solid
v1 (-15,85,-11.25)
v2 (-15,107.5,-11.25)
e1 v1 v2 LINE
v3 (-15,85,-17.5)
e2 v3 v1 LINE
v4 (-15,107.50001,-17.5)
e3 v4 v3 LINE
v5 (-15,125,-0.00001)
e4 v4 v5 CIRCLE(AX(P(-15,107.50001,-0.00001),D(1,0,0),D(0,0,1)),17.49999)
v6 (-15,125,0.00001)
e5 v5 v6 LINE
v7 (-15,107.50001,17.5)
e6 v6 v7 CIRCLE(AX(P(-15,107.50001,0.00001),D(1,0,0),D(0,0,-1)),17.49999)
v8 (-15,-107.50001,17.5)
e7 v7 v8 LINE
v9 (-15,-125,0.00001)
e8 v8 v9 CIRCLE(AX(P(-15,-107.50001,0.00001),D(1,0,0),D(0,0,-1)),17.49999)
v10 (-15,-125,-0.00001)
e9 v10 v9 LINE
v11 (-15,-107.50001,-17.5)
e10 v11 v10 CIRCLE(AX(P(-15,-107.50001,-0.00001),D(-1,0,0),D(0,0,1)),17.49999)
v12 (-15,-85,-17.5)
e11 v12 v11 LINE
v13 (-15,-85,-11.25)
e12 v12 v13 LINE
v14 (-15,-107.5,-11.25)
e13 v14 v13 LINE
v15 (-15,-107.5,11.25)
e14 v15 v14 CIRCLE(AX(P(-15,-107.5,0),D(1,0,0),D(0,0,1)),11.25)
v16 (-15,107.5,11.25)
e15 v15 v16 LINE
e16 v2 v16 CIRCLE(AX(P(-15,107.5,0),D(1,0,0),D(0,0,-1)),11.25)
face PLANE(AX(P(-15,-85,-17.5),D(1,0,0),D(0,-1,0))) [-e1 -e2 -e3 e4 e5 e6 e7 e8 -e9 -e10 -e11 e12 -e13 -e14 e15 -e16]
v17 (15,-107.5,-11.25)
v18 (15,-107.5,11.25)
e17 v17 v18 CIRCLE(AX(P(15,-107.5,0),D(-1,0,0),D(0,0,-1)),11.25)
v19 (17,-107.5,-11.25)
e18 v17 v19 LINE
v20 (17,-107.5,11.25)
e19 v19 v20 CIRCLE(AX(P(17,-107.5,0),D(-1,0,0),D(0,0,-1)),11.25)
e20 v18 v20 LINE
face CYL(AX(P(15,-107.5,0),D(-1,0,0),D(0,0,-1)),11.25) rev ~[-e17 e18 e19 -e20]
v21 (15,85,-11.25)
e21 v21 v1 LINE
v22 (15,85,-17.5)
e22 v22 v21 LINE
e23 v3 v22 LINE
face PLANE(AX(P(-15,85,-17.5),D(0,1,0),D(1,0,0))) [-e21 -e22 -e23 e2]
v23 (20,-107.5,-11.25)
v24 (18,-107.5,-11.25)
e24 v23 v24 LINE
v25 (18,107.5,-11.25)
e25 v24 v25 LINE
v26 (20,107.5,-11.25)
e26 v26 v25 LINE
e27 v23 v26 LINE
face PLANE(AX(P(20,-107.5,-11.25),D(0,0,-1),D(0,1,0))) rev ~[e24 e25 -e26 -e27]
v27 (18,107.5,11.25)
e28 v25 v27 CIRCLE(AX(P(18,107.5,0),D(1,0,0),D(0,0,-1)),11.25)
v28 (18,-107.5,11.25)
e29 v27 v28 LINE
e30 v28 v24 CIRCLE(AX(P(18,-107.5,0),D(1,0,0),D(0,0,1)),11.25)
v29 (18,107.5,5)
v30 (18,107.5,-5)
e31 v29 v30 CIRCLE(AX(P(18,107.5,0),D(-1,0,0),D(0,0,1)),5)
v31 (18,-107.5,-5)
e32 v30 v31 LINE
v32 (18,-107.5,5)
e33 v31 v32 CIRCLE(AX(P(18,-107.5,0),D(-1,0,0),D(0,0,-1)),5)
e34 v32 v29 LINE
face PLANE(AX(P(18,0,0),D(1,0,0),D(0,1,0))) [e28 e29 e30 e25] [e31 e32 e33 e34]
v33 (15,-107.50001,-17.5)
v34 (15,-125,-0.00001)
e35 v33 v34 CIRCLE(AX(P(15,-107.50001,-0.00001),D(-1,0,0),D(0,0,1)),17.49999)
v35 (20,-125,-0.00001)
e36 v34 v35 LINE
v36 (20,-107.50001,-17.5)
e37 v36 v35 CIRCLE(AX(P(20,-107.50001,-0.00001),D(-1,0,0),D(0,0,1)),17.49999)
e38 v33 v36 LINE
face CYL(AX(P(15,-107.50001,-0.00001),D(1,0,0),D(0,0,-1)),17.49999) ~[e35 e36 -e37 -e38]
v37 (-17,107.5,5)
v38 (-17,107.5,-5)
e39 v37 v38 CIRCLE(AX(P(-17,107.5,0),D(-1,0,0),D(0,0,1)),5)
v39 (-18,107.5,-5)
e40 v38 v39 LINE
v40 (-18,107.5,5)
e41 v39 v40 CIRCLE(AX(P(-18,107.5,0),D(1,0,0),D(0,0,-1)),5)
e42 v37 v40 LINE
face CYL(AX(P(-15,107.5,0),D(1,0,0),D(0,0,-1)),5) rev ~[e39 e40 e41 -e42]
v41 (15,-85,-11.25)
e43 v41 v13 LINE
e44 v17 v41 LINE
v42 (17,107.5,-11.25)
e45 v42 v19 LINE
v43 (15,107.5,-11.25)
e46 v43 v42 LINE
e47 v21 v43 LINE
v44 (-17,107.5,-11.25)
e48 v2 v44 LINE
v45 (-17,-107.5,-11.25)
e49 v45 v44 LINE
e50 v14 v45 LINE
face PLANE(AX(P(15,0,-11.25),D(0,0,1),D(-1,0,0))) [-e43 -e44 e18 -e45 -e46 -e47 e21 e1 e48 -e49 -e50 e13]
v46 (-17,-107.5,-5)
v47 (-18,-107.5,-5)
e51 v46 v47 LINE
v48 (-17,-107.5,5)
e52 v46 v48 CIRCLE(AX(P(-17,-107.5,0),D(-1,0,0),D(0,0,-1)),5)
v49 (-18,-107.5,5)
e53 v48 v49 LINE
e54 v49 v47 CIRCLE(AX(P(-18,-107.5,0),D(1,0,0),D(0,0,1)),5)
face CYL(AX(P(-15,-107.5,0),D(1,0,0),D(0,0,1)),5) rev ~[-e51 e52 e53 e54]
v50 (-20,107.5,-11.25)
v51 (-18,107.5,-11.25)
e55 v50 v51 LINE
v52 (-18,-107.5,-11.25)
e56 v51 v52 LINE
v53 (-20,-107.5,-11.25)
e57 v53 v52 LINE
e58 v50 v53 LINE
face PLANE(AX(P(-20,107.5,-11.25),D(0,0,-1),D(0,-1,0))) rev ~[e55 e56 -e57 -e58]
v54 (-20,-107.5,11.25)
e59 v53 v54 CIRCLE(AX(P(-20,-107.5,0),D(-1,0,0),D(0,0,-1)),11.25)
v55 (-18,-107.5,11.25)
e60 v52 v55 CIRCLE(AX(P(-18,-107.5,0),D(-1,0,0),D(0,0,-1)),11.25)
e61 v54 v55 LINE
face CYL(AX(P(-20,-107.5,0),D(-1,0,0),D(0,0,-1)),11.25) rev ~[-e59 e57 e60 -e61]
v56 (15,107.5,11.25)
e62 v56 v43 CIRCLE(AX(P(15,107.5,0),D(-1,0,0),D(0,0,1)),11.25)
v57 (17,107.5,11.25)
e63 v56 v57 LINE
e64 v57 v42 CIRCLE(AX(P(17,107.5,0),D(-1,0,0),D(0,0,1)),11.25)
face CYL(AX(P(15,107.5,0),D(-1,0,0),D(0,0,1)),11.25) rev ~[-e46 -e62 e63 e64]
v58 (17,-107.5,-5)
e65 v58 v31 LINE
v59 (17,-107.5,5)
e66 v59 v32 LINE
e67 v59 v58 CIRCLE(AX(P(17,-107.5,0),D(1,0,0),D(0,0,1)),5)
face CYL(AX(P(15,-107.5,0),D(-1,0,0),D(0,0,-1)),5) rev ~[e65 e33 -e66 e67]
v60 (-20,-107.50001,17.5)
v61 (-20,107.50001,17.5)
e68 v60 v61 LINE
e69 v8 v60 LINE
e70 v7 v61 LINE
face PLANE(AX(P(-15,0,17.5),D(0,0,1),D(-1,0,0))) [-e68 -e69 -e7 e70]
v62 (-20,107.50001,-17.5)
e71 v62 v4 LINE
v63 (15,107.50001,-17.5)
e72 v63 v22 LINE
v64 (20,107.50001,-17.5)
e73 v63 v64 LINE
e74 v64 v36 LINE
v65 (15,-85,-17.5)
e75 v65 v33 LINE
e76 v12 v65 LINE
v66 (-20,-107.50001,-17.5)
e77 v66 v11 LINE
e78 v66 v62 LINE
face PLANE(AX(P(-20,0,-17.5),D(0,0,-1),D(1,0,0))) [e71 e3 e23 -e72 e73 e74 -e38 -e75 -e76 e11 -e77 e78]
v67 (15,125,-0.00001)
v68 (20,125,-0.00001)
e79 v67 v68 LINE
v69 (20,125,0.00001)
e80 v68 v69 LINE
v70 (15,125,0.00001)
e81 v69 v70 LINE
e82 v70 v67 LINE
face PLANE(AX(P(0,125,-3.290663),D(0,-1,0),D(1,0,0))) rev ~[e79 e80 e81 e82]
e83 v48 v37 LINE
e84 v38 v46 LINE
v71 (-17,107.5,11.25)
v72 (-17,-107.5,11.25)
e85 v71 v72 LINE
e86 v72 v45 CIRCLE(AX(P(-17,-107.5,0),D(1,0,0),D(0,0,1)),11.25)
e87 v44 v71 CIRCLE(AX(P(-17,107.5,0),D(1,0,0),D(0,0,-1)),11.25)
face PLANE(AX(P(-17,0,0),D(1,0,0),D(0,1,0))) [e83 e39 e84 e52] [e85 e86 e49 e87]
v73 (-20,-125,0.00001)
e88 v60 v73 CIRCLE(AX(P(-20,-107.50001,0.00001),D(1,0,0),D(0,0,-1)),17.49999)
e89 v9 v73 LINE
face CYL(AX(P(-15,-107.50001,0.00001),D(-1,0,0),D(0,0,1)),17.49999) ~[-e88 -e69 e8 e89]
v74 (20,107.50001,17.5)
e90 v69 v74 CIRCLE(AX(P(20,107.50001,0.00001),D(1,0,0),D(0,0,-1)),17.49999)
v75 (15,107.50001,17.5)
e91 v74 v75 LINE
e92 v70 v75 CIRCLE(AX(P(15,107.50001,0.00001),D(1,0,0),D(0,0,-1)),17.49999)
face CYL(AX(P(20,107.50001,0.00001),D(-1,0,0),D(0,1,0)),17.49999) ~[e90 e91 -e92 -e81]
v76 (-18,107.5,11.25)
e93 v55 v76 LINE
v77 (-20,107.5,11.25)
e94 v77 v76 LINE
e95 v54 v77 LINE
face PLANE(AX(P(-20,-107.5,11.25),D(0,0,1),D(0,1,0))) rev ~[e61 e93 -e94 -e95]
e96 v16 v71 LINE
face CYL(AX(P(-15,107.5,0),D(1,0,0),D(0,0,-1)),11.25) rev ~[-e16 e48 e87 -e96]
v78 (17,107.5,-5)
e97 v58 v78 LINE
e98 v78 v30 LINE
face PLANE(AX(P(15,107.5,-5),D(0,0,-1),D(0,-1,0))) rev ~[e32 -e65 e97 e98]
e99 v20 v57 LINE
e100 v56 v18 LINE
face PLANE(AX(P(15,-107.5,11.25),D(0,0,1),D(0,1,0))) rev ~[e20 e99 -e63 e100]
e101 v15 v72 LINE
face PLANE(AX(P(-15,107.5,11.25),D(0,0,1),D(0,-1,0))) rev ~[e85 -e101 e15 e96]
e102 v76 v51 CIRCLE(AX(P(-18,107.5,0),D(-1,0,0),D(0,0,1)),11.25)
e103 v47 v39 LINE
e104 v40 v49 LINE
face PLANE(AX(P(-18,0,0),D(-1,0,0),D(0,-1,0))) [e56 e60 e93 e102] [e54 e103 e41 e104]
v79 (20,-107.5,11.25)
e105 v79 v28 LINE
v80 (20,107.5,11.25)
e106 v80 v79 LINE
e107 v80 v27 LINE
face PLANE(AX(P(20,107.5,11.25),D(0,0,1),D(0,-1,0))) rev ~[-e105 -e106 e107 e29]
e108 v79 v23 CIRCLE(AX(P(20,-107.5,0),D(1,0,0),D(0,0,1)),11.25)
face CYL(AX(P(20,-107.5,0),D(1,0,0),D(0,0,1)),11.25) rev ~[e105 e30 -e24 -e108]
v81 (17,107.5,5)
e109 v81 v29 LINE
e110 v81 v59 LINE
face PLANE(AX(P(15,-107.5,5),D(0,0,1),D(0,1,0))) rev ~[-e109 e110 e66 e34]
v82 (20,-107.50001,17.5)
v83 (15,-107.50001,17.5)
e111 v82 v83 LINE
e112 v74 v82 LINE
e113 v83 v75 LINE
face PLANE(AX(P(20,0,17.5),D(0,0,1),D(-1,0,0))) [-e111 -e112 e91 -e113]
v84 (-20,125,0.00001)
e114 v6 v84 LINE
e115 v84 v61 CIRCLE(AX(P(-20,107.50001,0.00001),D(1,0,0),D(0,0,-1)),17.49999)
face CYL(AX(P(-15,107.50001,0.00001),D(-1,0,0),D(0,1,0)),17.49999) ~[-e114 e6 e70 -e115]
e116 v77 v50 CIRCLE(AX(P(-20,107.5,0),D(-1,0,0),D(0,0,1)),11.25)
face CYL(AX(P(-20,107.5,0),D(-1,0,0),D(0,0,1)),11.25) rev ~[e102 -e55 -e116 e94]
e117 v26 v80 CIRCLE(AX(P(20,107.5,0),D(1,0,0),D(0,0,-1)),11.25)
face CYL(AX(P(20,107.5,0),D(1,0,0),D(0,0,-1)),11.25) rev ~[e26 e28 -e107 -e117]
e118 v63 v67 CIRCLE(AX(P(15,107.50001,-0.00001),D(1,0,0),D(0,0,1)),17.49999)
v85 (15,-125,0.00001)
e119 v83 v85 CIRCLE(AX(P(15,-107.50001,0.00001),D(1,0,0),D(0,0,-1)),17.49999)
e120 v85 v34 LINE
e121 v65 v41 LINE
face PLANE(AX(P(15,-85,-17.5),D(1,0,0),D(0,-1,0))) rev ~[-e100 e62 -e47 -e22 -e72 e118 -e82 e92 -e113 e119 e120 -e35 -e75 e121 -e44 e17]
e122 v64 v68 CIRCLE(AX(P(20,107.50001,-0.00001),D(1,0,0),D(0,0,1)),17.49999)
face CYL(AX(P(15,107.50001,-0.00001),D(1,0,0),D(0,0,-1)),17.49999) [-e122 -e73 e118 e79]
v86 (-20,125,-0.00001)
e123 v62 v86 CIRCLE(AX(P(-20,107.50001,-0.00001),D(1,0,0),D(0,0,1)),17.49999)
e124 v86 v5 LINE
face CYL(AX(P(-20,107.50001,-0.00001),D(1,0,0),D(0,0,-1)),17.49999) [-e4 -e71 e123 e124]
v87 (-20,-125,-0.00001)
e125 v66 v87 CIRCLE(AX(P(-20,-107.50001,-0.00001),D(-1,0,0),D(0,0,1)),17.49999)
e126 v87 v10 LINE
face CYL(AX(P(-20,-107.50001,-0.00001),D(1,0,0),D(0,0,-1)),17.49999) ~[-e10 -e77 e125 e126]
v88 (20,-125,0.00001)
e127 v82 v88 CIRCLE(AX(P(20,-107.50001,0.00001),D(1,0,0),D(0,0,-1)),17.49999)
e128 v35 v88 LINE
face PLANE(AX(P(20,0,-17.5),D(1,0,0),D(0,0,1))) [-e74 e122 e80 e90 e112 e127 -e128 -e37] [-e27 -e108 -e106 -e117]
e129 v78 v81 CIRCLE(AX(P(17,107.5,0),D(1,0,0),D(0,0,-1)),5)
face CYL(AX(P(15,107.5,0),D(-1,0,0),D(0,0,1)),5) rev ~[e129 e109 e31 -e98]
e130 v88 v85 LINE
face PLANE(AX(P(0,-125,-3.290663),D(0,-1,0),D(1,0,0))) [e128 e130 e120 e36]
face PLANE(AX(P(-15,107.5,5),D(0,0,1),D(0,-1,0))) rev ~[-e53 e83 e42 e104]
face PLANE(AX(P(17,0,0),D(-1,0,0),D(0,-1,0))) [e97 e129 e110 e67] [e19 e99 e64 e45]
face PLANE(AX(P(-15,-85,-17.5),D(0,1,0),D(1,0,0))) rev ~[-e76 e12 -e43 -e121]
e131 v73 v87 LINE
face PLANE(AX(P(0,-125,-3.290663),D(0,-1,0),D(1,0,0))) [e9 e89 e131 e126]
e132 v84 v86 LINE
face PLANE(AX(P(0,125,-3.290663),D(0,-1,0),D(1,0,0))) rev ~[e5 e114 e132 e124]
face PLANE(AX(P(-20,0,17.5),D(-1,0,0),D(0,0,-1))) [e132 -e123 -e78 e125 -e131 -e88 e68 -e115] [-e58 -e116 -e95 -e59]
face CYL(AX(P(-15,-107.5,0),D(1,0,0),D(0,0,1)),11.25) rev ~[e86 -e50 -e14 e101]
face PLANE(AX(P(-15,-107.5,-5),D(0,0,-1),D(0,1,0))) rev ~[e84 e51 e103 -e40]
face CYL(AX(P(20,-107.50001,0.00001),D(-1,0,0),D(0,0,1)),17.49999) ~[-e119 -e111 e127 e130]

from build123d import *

# Parameters (mm, degrees)
F1_DEPTH      = 125
F1_DEPTH_BACK = 125
F6_DEPTH      = 5.0009999999
F7_DEPTH      = 5.0010000001
F8_DEPTH      = 2
F9_DEPTH      = 2
F10_DEPTH     = 2
F11_DEPTH     = 2
F12_W         = 30
F12_H         = 40
F13_DEPTH     = 35.001
F14_R         = 17.49999


# Not quite as in the source:
# - a fillet or chamfer is up to 0.001 mm smaller than in the source, because OpenCascade refuses the exact size


with BuildPart() as f1:
    # F0 (on Front) → F1 (new body, two sides)
    with BuildSketch(Plane.XZ) as f1_sk:
        Polygon((-20, -17.5), (20, -17.5), (20, 17.5), (15, 17.5), (15, -11.25), (-15, -11.25), (-15, 17.5), (-20, 17.5), align=None)
    extrude(amount=F1_DEPTH)
    extrude(f1_sk.sketch, amount=-F1_DEPTH_BACK)

    # F3 (on face) → F6 (cut, through all)
    with BuildSketch(Plane(origin=(15.0000000001, 0, 0), x_dir=(0, -1, 0), z_dir=(-1, 0, 0))):
        with BuildLine():
            Line((107.5, 4.9999999999), (0, 4.9999999999))
            Line((0, 4.9999999999), (-107.5, 4.9999999999))
            ThreePointArc((-107.5, 4.9999999999), (-112.5, -2e-10), (-107.5, -5.0000000004))
            Line((-107.5, -5.0000000004), (0, -5.0000000004))
            Line((0, -5.0000000004), (107.5, -5.0000000004))
            ThreePointArc((107.5, -5.0000000004), (112.5000000001, -2e-10), (107.5, 4.9999999999))
        make_face()
    extrude(amount=-F6_DEPTH, mode=Mode.SUBTRACT)

    # F2 (on face) → F7 (cut, through all)
    with BuildSketch(Plane.YZ.offset(-14.9999999999)):
        with BuildLine():
            Line((107.5, 5), (0, 5))
            Line((0, 5), (-107.5, 5))
            ThreePointArc((-107.5, 5), (-112.5, 0), (-107.5, -5))
            Line((-107.5, -5), (0, -5))
            Line((0, -5), (107.5, -5))
            ThreePointArc((107.5, -5), (112.5, 0), (107.5, 5))
        make_face()
    extrude(amount=-F7_DEPTH, mode=Mode.SUBTRACT)

    # F3 (on face) → F8 (cut)
    with BuildSketch(Plane(origin=(15.0000000001, 0, 0), x_dir=(0, -1, 0), z_dir=(-1, 0, 0))):
        with BuildLine():
            Line((107.5, 11.25), (0, 11.25))
            Line((0, 11.25), (-107.5, 11.25))
            ThreePointArc((-107.5, 11.25), (-118.7500000002, -2e-10), (-107.5, -11.2500000005))
            Line((-107.5, -11.2500000005), (0, -11.2500000005))
            Line((0, -11.2500000005), (107.5, -11.2500000005))
            ThreePointArc((107.5, -11.2500000005), (118.7500000002, -2e-10), (107.5, 11.25))
        make_face()
        with BuildLine():
            Line((-107.5, 4.9999999999), (0, 4.9999999999))
            Line((0, 4.9999999999), (107.5, 4.9999999999))
            ThreePointArc((107.5, 4.9999999999), (112.5000000001, -2e-10), (107.5, -5.0000000004))
            Line((107.5, -5.0000000004), (0, -5.0000000004))
            Line((0, -5.0000000004), (-107.5, -5.0000000004))
            ThreePointArc((-107.5, -5.0000000004), (-112.5, -2e-10), (-107.5, 4.9999999999))
        make_face(mode=Mode.SUBTRACT)
    extrude(amount=-F8_DEPTH, mode=Mode.SUBTRACT)

    # F2 (on face) → F9 (cut)
    with BuildSketch(Plane.YZ.offset(-14.9999999999)):
        with BuildLine():
            Line((107.5, 11.25), (0, 11.25))
            Line((0, 11.25), (-107.5, 11.25))
            ThreePointArc((-107.5, 11.25), (-118.75, 0), (-107.5, -11.25))
            Line((-107.5, -11.25), (0, -11.25))
            Line((0, -11.25), (107.5, -11.25))
            ThreePointArc((107.5, -11.25), (118.75, 0), (107.5, 11.25))
        make_face()
        with BuildLine():
            Line((-107.5, 5), (0, 5))
            Line((0, 5), (107.5, 5))
            ThreePointArc((107.5, 5), (112.5, 0), (107.5, -5))
            Line((107.5, -5), (0, -5))
            Line((0, -5), (-107.5, -5))
            ThreePointArc((-107.5, -5), (-112.5, 0), (-107.5, 5))
        make_face(mode=Mode.SUBTRACT)
    extrude(amount=-F9_DEPTH, mode=Mode.SUBTRACT)

    # F4 (on face) → F10 (cut)
    with BuildSketch(Plane(origin=(-20, 0, 1e-10), x_dir=(0, -1, 0), z_dir=(-1, 0, 0))):
        with BuildLine():
            Line((107.5, 11.25), (0, 11.25))
            Line((0, 11.25), (-107.5, 11.25))
            ThreePointArc((-107.5, 11.25), (-118.75, 0), (-107.5, -11.25))
            Line((-107.5, -11.25), (0, -11.25))
            Line((0, -11.25), (107.5, -11.25))
            ThreePointArc((107.5, -11.25), (118.75, 0), (107.5, 11.25))
        make_face()
        with BuildLine():
            Line((-107.5, 5), (0, 5))
            Line((0, 5), (107.5, 5))
            ThreePointArc((107.5, 5), (112.5, 0), (107.5, -5))
            Line((107.5, -5), (0, -5))
            Line((0, -5), (-107.5, -5))
            ThreePointArc((-107.5, -5), (-112.5, 0), (-107.5, 5))
        make_face(mode=Mode.SUBTRACT)
    extrude(amount=-F10_DEPTH, mode=Mode.SUBTRACT)

    # F5 (on face) → F11 (cut)
    with BuildSketch(Plane.YZ.offset(20)):
        with BuildLine():
            Line((107.5, 11.25), (0, 11.25))
            Line((0, 11.25), (-107.5, 11.25))
            ThreePointArc((-107.5, 11.25), (-118.75, 0), (-107.5, -11.25))
            Line((-107.5, -11.25), (0, -11.25))
            Line((0, -11.25), (107.5, -11.25))
            ThreePointArc((107.5, -11.25), (118.75, 0), (107.5, 11.25))
        make_face()
        with BuildLine():
            Line((-107.5, 5), (0, 5))
            Line((0, 5), (107.5, 5))
            ThreePointArc((107.5, 5), (112.5, 0), (107.5, -5))
            Line((107.5, -5), (0, -5))
            Line((0, -5), (-107.5, -5))
            ThreePointArc((-107.5, -5), (-112.5, 0), (-107.5, 5))
        make_face(mode=Mode.SUBTRACT)
    extrude(amount=-F11_DEPTH, mode=Mode.SUBTRACT)

    # F12 (on face) → F13 (cut, through all)
    with BuildSketch(Plane(origin=(0, 0, -17.5), x_dir=(1, 0, 0), z_dir=(0, 0, -1))):
        with Locations((-2e-10, -105)):
            Rectangle(F12_W, F12_H)
        with Locations((-2e-10, 105)):
            Rectangle(F12_W, F12_H)
    extrude(amount=-F13_DEPTH, mode=Mode.SUBTRACT)

    # F14 (radius 17.5 in the source; OpenCascade refuses exactly that, so slightly less here)
    f14_edges = [f1.edges().sort_by_distance(p)[0] for p in [
        (17.5, 125, 17.5),
        (17.5, 125, -17.5),
        (-17.5, 125, -17.5),
        (-17.5, 125, 17.5),
        (-17.5, -125, -17.5),
        (-17.5, -125, 17.5),
        (17.5, -125, 17.5),
        (17.5, -125, -17.5),
    ]]
    fillet(f14_edges, radius=F14_R)


solid = f1.part
